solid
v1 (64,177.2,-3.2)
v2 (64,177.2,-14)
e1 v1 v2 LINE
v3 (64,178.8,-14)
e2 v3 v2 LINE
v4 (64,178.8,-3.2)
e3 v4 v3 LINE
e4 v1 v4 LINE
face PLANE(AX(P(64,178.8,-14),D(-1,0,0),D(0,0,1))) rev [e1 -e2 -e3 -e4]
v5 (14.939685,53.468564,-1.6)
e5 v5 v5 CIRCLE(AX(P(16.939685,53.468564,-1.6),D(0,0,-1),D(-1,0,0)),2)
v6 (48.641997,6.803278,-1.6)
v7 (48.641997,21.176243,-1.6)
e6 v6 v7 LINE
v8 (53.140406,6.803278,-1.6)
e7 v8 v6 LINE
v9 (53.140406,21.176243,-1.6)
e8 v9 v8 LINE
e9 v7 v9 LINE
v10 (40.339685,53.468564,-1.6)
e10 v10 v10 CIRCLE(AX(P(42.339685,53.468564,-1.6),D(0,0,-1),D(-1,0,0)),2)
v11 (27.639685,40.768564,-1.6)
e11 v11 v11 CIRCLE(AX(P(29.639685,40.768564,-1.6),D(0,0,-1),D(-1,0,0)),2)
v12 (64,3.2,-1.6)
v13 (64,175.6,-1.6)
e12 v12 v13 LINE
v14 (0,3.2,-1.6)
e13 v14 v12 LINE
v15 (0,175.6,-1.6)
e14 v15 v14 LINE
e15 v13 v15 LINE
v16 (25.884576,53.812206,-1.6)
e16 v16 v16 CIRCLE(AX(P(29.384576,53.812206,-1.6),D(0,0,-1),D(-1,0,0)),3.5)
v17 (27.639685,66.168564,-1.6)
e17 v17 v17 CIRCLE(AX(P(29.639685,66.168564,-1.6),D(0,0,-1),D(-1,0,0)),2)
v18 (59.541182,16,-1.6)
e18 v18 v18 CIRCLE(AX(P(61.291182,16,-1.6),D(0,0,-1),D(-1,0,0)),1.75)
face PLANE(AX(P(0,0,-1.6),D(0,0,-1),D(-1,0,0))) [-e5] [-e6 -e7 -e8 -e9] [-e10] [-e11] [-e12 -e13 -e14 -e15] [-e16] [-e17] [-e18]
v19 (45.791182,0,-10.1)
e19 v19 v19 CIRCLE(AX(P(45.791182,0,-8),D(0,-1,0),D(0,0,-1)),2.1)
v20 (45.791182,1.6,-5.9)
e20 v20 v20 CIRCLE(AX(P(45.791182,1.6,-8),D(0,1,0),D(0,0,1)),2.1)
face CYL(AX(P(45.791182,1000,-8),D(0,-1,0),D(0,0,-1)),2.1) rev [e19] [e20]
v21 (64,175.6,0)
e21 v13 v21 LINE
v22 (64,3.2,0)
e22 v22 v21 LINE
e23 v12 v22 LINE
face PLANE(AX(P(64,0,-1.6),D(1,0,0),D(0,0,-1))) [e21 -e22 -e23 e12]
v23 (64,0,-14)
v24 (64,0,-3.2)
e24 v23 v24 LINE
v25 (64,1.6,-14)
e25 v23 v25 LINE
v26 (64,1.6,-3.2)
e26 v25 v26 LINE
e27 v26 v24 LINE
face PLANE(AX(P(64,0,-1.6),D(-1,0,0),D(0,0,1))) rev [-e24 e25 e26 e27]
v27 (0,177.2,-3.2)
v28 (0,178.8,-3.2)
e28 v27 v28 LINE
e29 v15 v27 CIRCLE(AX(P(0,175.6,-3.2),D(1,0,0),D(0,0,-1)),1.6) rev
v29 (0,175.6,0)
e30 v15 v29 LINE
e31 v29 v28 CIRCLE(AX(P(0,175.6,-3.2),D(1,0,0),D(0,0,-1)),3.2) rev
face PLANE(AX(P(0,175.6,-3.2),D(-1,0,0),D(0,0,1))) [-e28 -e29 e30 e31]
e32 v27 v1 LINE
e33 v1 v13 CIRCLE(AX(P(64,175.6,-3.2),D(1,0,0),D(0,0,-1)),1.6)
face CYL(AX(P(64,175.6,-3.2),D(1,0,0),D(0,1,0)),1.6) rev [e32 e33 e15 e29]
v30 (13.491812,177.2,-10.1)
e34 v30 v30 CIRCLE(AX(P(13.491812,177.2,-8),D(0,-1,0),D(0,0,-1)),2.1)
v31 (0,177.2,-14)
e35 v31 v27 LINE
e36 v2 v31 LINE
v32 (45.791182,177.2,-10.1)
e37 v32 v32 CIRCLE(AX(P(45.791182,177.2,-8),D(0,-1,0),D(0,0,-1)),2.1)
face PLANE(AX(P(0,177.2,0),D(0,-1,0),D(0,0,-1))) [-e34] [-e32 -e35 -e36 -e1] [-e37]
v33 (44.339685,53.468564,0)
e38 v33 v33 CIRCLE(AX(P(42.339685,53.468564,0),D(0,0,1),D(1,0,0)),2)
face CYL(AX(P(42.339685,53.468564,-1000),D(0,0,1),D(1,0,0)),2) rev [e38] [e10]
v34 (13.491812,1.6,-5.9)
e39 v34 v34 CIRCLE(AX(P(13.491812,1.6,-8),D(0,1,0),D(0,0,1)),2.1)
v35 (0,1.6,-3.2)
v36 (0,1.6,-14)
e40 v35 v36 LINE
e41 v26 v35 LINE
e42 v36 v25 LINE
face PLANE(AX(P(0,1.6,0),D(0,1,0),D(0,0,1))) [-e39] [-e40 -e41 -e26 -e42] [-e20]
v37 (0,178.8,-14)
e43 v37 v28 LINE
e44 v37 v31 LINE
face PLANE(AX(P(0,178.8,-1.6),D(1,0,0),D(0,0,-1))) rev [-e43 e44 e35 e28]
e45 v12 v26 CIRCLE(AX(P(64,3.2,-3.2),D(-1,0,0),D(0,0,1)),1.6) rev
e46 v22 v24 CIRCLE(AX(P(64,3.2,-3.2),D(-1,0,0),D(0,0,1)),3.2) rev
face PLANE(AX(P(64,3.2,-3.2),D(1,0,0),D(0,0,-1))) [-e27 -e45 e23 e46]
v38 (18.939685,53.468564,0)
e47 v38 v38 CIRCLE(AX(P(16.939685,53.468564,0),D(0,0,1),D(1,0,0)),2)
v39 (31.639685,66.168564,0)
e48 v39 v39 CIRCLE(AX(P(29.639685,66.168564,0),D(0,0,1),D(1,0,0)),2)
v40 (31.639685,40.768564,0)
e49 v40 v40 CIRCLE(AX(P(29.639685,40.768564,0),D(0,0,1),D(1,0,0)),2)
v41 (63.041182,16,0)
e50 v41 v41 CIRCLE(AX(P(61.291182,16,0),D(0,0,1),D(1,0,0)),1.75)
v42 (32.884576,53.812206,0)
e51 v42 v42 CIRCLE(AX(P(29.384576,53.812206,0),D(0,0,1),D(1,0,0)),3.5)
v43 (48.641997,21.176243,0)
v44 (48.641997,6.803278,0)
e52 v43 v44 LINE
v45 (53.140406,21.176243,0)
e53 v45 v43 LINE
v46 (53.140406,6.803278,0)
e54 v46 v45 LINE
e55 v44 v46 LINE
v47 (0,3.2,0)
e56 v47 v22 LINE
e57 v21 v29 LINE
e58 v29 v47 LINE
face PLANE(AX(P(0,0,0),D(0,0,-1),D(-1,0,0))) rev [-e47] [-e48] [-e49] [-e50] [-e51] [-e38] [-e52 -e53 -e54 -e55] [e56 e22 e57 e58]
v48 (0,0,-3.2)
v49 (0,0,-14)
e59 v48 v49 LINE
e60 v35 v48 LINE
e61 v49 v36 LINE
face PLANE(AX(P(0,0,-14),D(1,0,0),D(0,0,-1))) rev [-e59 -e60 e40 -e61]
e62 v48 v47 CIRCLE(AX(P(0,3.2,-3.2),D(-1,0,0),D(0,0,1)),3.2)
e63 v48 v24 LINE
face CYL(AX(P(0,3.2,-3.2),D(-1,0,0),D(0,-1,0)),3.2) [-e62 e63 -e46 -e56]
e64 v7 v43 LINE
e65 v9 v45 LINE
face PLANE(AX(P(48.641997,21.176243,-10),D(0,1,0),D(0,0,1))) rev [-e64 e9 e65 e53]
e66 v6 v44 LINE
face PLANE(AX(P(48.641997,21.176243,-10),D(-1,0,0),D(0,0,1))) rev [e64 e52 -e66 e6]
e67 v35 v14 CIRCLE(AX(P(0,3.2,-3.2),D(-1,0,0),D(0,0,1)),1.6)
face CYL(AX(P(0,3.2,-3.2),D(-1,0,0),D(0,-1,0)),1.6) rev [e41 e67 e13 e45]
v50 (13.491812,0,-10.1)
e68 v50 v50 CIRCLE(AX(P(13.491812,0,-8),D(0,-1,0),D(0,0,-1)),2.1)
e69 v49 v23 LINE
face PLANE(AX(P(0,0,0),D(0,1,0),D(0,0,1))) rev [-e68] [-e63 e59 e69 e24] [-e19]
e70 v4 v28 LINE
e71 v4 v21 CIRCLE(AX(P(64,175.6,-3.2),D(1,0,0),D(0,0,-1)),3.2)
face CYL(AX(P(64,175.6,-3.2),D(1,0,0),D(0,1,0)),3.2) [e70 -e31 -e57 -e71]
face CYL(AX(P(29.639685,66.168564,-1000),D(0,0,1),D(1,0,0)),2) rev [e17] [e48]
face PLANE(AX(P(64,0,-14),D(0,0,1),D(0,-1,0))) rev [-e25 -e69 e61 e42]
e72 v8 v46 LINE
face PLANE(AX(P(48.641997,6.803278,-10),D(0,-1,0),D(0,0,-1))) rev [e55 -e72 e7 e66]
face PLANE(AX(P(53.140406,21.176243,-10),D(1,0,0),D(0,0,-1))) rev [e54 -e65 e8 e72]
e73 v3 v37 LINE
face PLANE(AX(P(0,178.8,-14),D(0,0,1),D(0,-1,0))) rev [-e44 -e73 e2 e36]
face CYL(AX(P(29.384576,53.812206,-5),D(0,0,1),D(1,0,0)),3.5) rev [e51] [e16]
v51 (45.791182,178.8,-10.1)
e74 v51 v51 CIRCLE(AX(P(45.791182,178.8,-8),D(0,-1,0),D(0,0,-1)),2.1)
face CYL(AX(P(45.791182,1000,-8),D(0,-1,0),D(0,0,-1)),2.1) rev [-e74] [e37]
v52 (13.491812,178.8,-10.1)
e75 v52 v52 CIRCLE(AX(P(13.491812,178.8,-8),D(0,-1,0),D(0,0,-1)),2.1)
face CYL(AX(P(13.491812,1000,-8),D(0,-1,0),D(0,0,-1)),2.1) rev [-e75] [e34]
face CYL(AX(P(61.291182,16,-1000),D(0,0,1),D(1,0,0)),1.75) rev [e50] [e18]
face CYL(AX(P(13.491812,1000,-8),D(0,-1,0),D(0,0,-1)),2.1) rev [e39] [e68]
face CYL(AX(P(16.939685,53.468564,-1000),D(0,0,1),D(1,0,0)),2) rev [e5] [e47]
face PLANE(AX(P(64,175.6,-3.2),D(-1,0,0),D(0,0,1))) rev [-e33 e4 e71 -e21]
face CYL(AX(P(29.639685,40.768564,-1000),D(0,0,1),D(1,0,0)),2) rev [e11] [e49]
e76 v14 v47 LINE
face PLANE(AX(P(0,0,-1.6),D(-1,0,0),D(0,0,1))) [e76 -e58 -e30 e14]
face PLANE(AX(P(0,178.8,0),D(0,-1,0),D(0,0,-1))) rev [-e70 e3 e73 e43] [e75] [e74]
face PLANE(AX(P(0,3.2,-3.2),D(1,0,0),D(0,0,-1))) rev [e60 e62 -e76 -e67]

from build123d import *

# Parameters (mm, degrees)
SKETCH1_W                    = 64
SKETCH1_H                    = 178.8
BASE_FLANGE1_DEPTH           = 1.6
EDGE_FLANGE1_STRIP_W         = 9.6
EDGE_FLANGE1_STRIP_H         = 1.6
EDGE_FLANGE1_STRIP_CUT_DEPTH = 64
EDGE_FLANGE1_DEPTH           = 64
EDGE_FLANGE2_STRIP_W         = 9.6
EDGE_FLANGE2_STRIP_H         = 1.6
EDGE_FLANGE2_STRIP_CUT_DEPTH = 64
EDGE_FLANGE2_DEPTH           = 64
SKETCH12_R                   = 2.1
CUT_EXTRUDE1_DEPTH           = 1000
SKETCH13_R                   = 1.75
SKETCH13_R_2                 = 2
CUT_EXTRUDE2_DEPTH           = 1000
SKETCH14_R                   = 3.5
CUT_EXTRUDE3_DEPTH           = 5
SKETCH15_W                   = 4.498408697
SKETCH15_H                   = 14.372964376
CUT_EXTRUDE4_DEPTH           = 10


# Sheet-metal steps are written as plain solids
with BuildPart() as part:
    # Sketch1 → Base-Flange1 (new body)
    with BuildSketch(Plane.XY):
        with Locations((32, 89.4)):
            Rectangle(SKETCH1_W, SKETCH1_H)
    extrude(amount=-BASE_FLANGE1_DEPTH)

    # Edge-Flange1 strip (across the edge) → Edge-Flange1 strip cut (cut)
    with BuildSketch(Plane(origin=(64, 0, -1.6), x_dir=(0, 1, 0), z_dir=(-1, 0, 0))):
        with Locations((-1.6, -0.8)):
            Rectangle(EDGE_FLANGE1_STRIP_W, EDGE_FLANGE1_STRIP_H)
    extrude(amount=EDGE_FLANGE1_STRIP_CUT_DEPTH, mode=Mode.SUBTRACT)

    # Edge-Flange1 section (across the edge) → Edge-Flange1 (add)
    with BuildSketch(Plane(origin=(64, 0, -1.6), x_dir=(0, 1, 0), z_dir=(-1, 0, 0))):
        with BuildLine():
            Line((0, 1.6), (0, 12.4))
            Line((0, 12.4), (1.6, 12.4))
            Line((1.6, 12.4), (1.6, 1.6))
            ThreePointArc((1.6, 1.6), (2.06862915, 0.46862915), (3.2, 0))
            Line((3.2, 0), (3.2, -1.6))
            ThreePointArc((3.2, -1.6), (0.9372583, -0.6627417), (0, 1.6))
        make_face()
    extrude(amount=EDGE_FLANGE1_DEPTH)

    # Edge-Flange2 strip (across the edge) → Edge-Flange2 strip cut (cut)
    with BuildSketch(Plane(origin=(0, 178.8, -1.6), x_dir=(0, -1, 0), z_dir=(1, 0, 0))):
        with Locations((-1.6, -0.8)):
            Rectangle(EDGE_FLANGE2_STRIP_W, EDGE_FLANGE2_STRIP_H)
    extrude(amount=EDGE_FLANGE2_STRIP_CUT_DEPTH, mode=Mode.SUBTRACT)

    # Edge-Flange2 section (across the edge) → Edge-Flange2 (add)
    with BuildSketch(Plane(origin=(0, 178.8, -1.6), x_dir=(0, -1, 0), z_dir=(1, 0, 0))):
        with BuildLine():
            Line((0, 1.6), (0, 12.4))
            Line((0, 12.4), (1.6, 12.4))
            Line((1.6, 12.4), (1.6, 1.6))
            ThreePointArc((1.6, 1.6), (2.06862915, 0.46862915), (3.2, 0))
            Line((3.2, 0), (3.2, -1.6))
            ThreePointArc((3.2, -1.6), (0.9372583, -0.6627417), (0, 1.6))
        make_face()
    extrude(amount=EDGE_FLANGE2_DEPTH)

    # Sketch12 → Cut-Extrude1 (cut)
    with BuildSketch(Plane.XZ):
        with Locations(Location((45.791182174, -8, 0), (0, 0, 270))):
            Circle(SKETCH12_R)
        with Locations(Location((13.491811911, -8, 0), (0, 0, 270))):
            Circle(SKETCH12_R)
    extrude(amount=-CUT_EXTRUDE1_DEPTH, mode=Mode.SUBTRACT)

    # Sketch13 → Cut-Extrude2 (cut)
    with BuildSketch(Plane.XY):
        with Locations((61.291182174, 16)):
            Circle(SKETCH13_R)
        with Locations((29.639685291, 40.768563608)):
            Circle(SKETCH13_R_2)
        with Locations((42.339685291, 53.468563608)):
            Circle(SKETCH13_R_2)
        with Locations((16.939685291, 53.468563608)):
            Circle(SKETCH13_R_2)
        with Locations((29.639685291, 66.168563608)):
            Circle(SKETCH13_R_2)
    extrude(amount=-CUT_EXTRUDE2_DEPTH, mode=Mode.SUBTRACT)

    # Sketch14 → Cut-Extrude3 (cut)
    with BuildSketch(Plane.XY):
        with Locations((29.384576347, 53.812205541)):
            Circle(SKETCH14_R)
    extrude(amount=-CUT_EXTRUDE3_DEPTH, mode=Mode.SUBTRACT)

    # Sketch15 → Cut-Extrude4 (cut)
    with BuildSketch(Plane.XY):
        with Locations((50.891201279, 13.989760377)):
            Rectangle(SKETCH15_W, SKETCH15_H)
    extrude(amount=-CUT_EXTRUDE4_DEPTH, mode=Mode.SUBTRACT)


solid = part.part
